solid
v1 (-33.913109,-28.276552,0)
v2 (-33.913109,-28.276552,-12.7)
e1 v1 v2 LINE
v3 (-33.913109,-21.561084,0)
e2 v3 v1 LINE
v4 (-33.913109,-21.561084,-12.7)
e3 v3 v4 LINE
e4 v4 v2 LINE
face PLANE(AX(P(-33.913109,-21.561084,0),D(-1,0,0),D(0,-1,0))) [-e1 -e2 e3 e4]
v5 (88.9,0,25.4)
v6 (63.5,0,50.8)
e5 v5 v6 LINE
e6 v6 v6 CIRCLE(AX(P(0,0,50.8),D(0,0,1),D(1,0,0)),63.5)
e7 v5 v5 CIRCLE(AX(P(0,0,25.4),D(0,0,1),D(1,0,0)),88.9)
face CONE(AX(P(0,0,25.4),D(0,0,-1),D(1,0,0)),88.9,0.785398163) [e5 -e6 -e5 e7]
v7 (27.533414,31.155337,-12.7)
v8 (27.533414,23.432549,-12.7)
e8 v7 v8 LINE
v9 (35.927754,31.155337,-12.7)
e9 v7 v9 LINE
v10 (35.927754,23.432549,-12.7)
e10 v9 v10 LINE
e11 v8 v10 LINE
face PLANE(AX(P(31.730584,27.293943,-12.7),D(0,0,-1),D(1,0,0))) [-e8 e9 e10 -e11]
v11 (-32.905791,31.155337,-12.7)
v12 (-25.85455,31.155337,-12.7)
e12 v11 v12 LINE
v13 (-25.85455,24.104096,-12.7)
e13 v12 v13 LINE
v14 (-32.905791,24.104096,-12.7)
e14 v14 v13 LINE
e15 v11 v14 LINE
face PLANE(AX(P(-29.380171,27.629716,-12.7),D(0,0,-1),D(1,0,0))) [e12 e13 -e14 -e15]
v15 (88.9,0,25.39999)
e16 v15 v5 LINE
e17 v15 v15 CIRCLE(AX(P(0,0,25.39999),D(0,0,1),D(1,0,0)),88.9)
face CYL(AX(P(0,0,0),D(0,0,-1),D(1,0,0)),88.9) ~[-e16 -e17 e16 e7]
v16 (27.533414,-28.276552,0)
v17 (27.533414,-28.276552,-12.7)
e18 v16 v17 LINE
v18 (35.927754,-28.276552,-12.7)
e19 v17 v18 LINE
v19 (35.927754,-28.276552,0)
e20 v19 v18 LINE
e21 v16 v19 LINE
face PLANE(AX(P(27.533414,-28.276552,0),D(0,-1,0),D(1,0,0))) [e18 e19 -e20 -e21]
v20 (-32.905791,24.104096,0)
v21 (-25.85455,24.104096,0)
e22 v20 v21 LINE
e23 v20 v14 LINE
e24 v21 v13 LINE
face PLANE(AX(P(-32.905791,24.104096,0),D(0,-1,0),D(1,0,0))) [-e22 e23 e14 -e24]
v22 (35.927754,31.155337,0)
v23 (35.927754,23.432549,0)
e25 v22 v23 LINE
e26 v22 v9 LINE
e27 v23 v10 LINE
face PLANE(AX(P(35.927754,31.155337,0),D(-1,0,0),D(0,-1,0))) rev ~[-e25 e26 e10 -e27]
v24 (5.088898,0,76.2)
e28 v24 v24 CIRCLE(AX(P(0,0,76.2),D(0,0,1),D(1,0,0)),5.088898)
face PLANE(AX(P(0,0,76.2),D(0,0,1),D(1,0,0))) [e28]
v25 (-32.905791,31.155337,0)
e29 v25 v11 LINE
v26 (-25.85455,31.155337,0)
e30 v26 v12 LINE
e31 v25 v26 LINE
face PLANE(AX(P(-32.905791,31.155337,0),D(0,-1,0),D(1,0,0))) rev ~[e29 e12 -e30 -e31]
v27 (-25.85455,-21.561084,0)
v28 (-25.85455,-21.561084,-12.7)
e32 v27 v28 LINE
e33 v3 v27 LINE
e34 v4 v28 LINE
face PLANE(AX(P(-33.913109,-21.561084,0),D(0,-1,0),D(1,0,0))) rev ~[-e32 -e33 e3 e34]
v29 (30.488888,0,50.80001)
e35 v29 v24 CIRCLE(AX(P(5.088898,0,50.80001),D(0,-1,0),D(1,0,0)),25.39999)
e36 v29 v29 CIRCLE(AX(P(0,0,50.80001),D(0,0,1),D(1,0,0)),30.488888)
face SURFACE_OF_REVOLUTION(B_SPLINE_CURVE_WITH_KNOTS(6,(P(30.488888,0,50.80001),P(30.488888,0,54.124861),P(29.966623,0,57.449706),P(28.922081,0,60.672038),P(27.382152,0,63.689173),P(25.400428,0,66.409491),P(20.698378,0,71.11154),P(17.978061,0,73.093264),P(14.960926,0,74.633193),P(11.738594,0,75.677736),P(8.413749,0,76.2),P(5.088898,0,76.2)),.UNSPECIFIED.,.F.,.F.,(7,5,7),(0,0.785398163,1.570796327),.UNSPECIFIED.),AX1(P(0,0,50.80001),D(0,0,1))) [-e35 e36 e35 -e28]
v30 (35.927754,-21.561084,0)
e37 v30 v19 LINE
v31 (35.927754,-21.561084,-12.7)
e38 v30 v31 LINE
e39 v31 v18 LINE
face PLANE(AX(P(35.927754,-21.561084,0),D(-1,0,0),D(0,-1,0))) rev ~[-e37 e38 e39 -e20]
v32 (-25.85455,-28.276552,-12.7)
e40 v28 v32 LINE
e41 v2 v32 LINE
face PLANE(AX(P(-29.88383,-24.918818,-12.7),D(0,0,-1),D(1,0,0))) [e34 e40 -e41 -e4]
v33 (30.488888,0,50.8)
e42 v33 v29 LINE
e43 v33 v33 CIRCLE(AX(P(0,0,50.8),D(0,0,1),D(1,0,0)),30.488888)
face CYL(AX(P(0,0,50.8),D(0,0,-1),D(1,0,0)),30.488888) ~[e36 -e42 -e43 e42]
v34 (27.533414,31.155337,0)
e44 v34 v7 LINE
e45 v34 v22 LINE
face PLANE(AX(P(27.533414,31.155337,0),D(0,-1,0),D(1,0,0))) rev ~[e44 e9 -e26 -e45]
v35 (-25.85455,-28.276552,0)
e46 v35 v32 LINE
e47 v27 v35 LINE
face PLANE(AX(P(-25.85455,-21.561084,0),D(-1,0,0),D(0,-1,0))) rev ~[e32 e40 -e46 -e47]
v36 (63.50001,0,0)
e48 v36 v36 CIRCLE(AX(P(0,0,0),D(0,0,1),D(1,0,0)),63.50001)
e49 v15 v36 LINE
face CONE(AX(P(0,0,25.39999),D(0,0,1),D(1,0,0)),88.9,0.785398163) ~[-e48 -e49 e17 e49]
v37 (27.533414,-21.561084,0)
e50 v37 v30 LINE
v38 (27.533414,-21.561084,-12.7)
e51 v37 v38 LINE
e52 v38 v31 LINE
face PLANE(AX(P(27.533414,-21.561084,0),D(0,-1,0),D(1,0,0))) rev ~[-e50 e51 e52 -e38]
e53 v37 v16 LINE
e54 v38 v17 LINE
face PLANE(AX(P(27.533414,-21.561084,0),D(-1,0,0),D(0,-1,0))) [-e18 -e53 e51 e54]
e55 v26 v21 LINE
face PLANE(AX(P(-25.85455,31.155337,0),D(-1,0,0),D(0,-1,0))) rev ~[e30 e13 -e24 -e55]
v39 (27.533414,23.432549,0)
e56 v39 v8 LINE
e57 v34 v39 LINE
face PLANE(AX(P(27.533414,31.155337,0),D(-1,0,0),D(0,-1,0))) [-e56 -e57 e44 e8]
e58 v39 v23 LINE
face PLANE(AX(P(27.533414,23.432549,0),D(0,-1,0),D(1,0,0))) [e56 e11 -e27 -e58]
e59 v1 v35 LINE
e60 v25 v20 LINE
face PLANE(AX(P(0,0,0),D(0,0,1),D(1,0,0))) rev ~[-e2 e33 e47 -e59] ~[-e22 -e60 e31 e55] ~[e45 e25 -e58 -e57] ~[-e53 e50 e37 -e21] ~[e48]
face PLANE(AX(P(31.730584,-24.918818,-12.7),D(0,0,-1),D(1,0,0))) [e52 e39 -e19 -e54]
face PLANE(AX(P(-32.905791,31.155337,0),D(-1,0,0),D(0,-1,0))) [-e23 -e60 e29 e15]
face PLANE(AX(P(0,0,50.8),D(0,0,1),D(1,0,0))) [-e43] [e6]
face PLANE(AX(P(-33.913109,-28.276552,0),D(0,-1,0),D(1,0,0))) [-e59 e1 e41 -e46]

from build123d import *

# Parameters (mm, degrees)
F0_R     = 88.9
F1_DEPTH = 50.8
F2_SIZE  = 25.4
F3_SIZE  = 25.39999
F4_R     = 30.4888877606
F5_DEPTH = 25.4
F6_R     = 25.39999
F7_W     = 8.3943400532
F7_H     = 6.7154671997
F7_W_2   = 8.0585591495
F7_W_3   = 7.0512406528
F7_H_2   = 7.0512406528
F7_H_3   = 7.722787559
F8_DEPTH = 12.7


# Not quite as in the source:
# - a fillet or chamfer is up to 0.001 mm smaller than in the source, because OpenCascade refuses the exact size


with BuildPart() as f1:
    # F0 (on Top) → F1 (new body)
    with BuildSketch(Plane.XY):
        Circle(F0_R)
    extrude(amount=F1_DEPTH)

    # F2
    f2_edges = [f1.edges().sort_by_distance(p)[0] for p in [
        (-88.9, 0, 50.8),
    ]]
    chamfer(f2_edges, length=F2_SIZE)

    # F3 (size 25.4 in the source; OpenCascade refuses exactly that, so slightly less here)
    f3_edges = [f1.edges().sort_by_distance(p)[0] for p in [
        (-88.9, 0, 0),
    ]]
    chamfer(f3_edges, length=F3_SIZE)

    # F4 (on face) → F5 (join)
    with BuildSketch(Plane.XY.offset(50.8)):
        Circle(F4_R)
    extrude(amount=F5_DEPTH)

    # F6 (radius 25.4 in the source; OpenCascade refuses exactly that, so slightly less here)
    f6_edges = [f1.edges().sort_by_distance(p)[0] for p in [
        (-30.488888, 0, 76.2),
    ]]
    fillet(f6_edges, radius=F6_R)

    # F7 (on face) → F8 (join)
    with BuildSketch(Plane(origin=(0, 0, 0), x_dir=(1, 0, 0), z_dir=(0, 0, -1))):
        with Locations((31.7305838689, 24.918817915)):
            Rectangle(F7_W, F7_H)
        with Locations((-29.8838298768, 24.918817915)):
            Rectangle(F7_W_2, F7_H)
        with Locations((-29.3801706284, -27.6297163218)):
            Rectangle(F7_W_3, F7_H_2)
        with Locations((31.7305838689, -27.2939428687)):
            Rectangle(F7_W, F7_H_3)
    extrude(amount=F8_DEPTH)


solid = f1.part
